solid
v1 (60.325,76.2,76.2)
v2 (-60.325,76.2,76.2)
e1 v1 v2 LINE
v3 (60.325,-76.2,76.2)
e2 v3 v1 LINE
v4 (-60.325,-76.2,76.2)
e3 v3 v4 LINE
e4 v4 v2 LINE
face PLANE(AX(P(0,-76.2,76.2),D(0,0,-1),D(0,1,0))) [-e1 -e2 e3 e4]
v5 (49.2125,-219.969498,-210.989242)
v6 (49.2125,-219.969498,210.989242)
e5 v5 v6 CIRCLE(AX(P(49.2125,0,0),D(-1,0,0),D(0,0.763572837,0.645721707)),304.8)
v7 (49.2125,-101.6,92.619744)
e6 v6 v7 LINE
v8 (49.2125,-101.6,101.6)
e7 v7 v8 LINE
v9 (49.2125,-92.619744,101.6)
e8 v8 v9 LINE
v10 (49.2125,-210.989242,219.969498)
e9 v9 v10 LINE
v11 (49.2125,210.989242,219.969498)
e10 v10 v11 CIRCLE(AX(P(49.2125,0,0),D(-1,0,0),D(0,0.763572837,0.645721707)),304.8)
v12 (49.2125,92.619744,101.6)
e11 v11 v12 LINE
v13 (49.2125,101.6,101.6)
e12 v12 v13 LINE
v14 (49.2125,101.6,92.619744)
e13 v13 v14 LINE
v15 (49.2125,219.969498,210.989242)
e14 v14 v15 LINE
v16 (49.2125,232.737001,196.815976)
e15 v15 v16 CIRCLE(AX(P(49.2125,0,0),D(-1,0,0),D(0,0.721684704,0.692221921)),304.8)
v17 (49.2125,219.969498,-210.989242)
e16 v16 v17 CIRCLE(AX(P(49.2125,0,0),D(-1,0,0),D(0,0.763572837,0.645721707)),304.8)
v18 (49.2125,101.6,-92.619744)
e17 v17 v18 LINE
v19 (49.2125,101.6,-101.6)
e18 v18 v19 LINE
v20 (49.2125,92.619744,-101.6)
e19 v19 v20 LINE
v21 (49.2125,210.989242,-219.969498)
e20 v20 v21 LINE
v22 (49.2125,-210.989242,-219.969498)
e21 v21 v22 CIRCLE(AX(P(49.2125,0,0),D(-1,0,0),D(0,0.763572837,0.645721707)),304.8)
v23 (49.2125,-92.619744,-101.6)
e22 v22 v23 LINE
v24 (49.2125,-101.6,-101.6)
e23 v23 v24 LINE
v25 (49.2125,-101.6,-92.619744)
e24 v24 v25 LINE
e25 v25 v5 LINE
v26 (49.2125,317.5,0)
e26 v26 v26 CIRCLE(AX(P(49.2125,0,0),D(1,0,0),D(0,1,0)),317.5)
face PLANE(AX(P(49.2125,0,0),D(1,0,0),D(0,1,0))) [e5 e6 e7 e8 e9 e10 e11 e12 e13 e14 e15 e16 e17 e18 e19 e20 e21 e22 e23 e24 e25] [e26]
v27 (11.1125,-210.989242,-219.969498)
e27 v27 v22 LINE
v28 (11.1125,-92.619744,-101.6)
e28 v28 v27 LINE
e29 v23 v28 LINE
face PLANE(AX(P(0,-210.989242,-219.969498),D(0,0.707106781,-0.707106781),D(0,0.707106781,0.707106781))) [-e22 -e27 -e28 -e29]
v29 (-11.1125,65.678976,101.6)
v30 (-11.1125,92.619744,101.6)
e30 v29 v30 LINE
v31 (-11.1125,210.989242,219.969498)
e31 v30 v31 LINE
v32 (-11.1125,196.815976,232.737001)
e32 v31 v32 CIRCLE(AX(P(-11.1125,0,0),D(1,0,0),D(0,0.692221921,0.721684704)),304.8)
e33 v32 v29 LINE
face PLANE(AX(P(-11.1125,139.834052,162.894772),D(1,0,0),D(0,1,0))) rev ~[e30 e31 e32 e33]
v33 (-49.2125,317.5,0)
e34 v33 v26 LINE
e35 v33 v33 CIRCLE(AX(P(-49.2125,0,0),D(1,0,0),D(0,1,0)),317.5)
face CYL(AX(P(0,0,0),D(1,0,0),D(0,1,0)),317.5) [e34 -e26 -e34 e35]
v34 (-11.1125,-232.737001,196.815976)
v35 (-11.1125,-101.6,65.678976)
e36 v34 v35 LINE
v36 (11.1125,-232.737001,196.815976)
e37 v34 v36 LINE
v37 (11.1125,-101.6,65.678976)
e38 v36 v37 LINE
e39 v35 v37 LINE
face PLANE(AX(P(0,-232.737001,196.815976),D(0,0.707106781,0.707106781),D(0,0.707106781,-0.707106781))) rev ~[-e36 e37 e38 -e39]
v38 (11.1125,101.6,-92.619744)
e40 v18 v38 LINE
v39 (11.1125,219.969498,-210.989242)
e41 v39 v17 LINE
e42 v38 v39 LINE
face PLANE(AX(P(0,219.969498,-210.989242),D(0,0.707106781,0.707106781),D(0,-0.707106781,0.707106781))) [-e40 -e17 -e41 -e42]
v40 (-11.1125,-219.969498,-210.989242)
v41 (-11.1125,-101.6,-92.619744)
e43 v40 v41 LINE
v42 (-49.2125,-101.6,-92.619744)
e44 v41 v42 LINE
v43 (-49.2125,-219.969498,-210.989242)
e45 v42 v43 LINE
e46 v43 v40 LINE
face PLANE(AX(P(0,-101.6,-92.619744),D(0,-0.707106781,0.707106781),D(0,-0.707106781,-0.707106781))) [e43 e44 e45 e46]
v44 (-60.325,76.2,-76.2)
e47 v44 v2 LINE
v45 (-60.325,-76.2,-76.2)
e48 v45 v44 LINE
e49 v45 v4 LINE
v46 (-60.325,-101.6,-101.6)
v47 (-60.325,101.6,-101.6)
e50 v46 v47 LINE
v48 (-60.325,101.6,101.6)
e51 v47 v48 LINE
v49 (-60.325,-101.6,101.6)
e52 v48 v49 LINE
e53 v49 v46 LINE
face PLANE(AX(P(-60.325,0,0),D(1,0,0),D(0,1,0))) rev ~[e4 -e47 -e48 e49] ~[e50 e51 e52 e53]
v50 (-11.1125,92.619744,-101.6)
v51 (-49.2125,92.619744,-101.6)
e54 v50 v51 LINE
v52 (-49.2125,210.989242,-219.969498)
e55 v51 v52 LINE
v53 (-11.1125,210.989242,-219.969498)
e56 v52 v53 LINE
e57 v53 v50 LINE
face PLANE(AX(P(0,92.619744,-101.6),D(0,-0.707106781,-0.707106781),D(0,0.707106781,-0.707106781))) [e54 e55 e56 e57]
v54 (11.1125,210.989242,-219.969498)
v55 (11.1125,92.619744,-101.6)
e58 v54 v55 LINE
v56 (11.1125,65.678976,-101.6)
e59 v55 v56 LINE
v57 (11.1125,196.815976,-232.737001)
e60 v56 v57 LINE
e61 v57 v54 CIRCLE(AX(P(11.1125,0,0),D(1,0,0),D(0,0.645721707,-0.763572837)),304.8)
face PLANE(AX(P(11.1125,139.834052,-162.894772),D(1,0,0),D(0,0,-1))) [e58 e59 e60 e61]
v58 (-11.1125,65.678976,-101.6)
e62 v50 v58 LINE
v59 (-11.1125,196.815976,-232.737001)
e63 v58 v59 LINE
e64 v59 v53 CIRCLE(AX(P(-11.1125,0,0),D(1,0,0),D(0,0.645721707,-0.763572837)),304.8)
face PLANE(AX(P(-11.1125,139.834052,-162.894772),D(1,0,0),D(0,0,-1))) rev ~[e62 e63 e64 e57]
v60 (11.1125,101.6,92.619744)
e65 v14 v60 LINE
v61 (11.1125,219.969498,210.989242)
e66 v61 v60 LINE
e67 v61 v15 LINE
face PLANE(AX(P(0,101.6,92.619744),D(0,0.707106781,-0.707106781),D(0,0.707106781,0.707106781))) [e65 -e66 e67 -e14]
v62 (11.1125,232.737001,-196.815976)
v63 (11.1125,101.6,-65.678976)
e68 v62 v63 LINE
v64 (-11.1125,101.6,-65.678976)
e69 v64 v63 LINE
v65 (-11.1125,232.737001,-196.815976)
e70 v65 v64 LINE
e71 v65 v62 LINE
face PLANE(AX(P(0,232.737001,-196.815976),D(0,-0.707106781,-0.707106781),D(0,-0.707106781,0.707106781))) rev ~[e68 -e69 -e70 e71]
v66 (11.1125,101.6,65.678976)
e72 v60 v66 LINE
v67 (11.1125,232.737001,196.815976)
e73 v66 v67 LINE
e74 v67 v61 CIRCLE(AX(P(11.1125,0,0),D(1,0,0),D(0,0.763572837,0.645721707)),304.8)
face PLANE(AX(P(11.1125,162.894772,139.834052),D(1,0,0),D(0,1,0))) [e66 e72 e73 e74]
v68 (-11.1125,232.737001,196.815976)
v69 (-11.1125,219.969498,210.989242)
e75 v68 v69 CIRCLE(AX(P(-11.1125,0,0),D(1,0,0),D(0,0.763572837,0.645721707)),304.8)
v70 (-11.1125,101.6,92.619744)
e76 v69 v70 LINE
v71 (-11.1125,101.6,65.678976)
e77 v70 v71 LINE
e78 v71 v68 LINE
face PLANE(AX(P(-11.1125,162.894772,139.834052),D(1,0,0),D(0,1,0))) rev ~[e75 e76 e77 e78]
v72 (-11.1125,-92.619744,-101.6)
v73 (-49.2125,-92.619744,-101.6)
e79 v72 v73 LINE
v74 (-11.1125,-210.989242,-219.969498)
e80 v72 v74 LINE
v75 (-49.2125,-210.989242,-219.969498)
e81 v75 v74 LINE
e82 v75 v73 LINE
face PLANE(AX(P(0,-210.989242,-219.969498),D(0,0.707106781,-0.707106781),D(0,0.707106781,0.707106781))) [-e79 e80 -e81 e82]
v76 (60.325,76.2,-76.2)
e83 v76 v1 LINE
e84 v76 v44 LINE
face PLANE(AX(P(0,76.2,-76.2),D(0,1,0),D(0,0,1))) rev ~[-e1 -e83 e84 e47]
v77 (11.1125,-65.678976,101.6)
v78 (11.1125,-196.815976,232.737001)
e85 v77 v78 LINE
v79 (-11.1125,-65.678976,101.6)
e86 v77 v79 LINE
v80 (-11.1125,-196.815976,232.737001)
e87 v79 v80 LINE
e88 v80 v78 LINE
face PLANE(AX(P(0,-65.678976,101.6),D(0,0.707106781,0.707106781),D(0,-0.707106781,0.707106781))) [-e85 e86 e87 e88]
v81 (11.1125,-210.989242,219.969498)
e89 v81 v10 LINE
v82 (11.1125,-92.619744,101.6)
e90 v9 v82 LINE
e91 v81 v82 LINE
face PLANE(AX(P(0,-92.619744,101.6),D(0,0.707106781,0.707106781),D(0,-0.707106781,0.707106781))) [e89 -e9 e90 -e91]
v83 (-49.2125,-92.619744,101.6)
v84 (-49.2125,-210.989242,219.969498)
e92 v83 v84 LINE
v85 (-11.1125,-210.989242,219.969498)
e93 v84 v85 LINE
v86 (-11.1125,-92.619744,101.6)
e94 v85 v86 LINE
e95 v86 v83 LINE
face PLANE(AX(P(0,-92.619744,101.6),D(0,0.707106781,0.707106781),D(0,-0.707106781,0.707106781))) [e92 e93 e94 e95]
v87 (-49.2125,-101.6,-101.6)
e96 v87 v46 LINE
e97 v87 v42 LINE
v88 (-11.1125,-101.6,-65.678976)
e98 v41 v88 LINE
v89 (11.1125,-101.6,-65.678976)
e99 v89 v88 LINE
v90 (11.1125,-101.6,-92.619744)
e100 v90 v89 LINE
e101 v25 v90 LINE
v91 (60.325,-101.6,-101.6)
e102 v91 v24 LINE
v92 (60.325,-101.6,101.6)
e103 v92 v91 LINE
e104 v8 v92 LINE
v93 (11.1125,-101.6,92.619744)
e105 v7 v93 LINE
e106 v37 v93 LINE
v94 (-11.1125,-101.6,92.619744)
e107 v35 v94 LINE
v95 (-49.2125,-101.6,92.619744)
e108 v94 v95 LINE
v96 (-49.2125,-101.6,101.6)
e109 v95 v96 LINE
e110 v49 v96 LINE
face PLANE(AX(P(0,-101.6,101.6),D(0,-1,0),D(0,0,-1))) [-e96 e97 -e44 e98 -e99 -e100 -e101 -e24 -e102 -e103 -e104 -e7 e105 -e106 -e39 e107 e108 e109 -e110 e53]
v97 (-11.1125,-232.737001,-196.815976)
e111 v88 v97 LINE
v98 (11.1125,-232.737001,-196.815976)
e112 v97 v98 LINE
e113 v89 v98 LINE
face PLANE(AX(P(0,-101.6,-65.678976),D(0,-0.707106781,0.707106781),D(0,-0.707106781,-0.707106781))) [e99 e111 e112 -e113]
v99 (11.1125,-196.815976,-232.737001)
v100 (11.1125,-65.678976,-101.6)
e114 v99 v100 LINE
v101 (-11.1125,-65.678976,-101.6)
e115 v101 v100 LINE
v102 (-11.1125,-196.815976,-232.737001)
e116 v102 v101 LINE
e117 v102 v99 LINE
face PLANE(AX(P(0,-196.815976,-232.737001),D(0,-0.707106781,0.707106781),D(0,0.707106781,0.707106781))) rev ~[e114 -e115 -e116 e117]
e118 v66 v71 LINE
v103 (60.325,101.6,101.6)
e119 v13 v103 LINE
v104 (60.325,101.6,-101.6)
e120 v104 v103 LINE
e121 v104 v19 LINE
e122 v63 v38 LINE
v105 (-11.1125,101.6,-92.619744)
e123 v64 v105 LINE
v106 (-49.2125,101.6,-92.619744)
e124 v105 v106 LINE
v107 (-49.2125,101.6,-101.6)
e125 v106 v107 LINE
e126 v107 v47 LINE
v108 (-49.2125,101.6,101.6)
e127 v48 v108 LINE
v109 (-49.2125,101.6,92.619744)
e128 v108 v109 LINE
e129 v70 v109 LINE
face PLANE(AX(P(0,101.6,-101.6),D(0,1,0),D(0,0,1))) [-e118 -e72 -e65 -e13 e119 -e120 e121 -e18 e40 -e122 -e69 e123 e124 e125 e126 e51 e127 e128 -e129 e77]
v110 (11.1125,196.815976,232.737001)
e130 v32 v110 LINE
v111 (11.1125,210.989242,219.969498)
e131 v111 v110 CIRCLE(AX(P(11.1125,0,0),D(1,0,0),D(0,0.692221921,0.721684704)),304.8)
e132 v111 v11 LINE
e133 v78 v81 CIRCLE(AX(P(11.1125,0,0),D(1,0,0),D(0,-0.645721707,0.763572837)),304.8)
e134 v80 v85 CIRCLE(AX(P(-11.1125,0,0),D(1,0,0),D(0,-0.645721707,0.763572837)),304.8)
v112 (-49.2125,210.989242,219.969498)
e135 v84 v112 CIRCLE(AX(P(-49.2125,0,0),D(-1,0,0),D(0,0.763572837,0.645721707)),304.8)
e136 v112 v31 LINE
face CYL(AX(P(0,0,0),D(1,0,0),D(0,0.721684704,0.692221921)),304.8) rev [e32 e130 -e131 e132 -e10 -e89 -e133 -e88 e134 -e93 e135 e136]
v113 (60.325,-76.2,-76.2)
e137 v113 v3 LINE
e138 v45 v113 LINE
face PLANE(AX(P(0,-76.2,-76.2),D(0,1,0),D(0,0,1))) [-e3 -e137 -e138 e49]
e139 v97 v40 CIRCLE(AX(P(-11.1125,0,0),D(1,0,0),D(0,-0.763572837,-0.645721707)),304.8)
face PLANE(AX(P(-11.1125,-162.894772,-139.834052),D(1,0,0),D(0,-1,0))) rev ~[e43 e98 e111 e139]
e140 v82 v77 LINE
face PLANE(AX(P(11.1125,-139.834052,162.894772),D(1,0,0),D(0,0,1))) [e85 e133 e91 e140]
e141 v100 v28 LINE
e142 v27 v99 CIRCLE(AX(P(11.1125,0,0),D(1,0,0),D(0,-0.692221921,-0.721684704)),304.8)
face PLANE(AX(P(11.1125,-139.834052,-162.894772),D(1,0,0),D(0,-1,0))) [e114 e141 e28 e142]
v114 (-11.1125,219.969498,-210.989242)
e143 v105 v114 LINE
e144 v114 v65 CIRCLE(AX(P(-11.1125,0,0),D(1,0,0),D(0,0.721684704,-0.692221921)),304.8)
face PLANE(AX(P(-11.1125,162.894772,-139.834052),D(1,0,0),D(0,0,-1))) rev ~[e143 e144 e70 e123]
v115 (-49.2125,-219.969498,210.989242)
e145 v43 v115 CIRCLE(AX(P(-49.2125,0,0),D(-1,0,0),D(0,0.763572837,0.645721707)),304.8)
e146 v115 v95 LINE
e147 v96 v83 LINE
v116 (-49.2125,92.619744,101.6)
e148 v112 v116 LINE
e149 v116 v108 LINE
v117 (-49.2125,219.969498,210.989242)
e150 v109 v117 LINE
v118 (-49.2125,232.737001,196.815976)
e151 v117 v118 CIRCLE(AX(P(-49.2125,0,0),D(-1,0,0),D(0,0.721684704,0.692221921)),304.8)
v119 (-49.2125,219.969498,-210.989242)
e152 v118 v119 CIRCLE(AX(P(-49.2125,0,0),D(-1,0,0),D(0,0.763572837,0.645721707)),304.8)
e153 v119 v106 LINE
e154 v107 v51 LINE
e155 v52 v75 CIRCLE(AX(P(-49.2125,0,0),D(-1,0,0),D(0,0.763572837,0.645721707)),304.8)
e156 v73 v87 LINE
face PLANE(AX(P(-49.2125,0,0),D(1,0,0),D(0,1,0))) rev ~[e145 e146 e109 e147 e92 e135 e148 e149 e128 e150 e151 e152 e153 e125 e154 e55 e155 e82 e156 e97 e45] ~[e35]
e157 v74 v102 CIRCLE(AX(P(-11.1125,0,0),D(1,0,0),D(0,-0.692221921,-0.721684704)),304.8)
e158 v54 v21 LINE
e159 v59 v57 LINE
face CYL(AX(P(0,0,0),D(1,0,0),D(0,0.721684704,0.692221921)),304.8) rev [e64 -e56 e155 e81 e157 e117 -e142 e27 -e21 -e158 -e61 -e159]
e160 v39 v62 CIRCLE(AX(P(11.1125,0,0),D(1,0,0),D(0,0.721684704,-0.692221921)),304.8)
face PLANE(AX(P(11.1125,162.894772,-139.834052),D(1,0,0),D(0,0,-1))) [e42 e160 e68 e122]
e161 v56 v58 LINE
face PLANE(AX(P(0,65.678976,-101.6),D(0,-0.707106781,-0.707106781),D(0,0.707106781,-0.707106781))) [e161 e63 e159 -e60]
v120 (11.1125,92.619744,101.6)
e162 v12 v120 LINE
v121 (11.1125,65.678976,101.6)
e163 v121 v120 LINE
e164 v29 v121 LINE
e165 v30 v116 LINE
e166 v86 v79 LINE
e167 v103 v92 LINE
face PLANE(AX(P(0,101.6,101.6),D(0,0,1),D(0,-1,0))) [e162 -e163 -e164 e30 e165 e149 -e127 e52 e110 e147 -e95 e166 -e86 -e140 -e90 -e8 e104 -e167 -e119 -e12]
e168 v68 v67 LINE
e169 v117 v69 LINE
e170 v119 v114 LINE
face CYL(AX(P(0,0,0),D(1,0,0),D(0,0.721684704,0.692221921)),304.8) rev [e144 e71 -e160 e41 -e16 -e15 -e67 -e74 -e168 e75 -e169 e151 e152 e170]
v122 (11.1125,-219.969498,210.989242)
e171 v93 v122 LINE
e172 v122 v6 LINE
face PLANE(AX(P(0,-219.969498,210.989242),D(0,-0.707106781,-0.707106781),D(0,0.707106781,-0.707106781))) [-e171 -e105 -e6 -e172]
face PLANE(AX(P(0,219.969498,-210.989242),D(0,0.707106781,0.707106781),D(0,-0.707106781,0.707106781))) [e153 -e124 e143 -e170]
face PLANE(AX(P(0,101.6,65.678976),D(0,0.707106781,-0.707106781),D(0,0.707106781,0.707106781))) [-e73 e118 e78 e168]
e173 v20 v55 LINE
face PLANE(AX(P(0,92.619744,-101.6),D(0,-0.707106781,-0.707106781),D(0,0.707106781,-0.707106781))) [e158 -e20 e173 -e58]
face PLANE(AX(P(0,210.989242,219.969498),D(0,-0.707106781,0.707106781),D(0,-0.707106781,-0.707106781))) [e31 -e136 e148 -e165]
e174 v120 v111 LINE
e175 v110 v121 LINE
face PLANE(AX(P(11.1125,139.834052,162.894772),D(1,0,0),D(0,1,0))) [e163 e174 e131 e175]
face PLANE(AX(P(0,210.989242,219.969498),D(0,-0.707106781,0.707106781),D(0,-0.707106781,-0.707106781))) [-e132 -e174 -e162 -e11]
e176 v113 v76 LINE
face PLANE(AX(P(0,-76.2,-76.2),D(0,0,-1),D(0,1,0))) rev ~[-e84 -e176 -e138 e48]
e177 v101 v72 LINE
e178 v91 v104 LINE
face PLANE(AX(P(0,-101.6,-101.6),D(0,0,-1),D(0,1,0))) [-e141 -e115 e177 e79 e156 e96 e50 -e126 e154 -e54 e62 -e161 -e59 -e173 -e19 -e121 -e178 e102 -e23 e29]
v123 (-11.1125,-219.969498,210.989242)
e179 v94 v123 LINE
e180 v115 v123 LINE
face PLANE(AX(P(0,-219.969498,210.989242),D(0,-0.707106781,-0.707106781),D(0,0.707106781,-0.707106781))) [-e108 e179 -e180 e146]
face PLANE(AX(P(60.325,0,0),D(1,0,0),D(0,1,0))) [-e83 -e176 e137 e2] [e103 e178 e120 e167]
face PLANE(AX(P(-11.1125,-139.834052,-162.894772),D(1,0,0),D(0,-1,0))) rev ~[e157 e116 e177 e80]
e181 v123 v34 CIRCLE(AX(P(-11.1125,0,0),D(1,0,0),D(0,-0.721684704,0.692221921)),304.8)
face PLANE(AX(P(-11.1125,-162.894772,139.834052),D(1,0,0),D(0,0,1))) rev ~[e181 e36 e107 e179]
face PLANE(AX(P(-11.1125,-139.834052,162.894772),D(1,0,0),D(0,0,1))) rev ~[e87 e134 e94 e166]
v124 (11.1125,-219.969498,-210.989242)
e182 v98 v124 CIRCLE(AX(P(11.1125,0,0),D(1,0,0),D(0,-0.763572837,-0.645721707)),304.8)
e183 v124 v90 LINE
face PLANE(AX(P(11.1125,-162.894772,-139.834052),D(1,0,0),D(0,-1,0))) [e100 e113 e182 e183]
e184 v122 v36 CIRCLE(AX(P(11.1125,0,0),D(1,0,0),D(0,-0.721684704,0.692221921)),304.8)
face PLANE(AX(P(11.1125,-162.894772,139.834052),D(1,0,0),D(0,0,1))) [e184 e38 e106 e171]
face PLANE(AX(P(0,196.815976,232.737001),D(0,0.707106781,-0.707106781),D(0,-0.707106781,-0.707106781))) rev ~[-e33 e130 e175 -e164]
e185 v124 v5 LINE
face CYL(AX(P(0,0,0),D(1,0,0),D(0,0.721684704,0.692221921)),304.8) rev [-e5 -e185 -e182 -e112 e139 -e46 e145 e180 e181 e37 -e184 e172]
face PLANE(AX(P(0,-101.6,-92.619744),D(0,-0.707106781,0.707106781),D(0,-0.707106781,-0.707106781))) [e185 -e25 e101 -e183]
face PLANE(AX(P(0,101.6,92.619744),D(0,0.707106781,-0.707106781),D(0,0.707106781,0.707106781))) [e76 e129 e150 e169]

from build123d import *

# Parameters (mm, degrees)
F0_W            = 152.4
F0_H            = 152.4
F1_DEPTH        = 60.325
F2_DEPTH        = 49.2125
F2_COPIES_COUNT = 4
F3_DEPTH        = 11.1125
F3_COPIES_COUNT = 4
F0_R            = 317.5
F4_DEPTH        = 49.2125


# Not quite as in the source:
# - a pattern or mirror of a feature is missing from the dataset's text; its kind, count and spacing are read off the source's solid


with BuildPart() as f1:
    # F0 (on Right) → F1 (new body, symmetric)
    with BuildSketch(Plane.YZ):
        Polygon((101.6, -101.6), (101.6, 65.6789755157), (101.6, 92.6197438789), (101.6, 101.6), (92.6197438789, 101.6), (65.6789755157, 101.6), (-101.6, 101.6), (-101.6, -101.6), align=None)
        Rectangle(F0_W, F0_H, mode=Mode.SUBTRACT)
    extrude(amount=F1_DEPTH, both=True)

    # F0 (on Right) → F2 (join, symmetric)
    with BuildSketch(Plane.YZ):
        with BuildLine():
            Line((101.6, 92.6197438789), (219.9694977227, 210.9892416016))
            ThreePointArc((219.9694977227, 210.9892416016), (215.5261469057, 215.5261469057), (210.9892416016, 219.9694977227))
            Line((210.9892416016, 219.9694977227), (92.6197438789, 101.6))
            Line((92.6197438789, 101.6), (101.6, 101.6))
            Line((101.6, 101.6), (101.6, 92.6197438789))
        make_face()
    f2 = extrude(amount=F2_DEPTH, both=True)

    # F2_copies: F2 ×4 about axis
    f2_copies_axis = Axis((0, 0, 0), (1, 0, 0))
    for i in range(1, F2_COPIES_COUNT):
        add(f2.rotate(f2_copies_axis, i * 360 / F2_COPIES_COUNT))

    # F0 (on Right) → F3 (join, symmetric)
    with BuildSketch(Plane.YZ):
        with BuildLine():
            ThreePointArc((210.9892416016, 219.9694977227), (204.0025151944, 226.4641556502), (196.815976229, 232.7370007133))
            Line((196.815976229, 232.7370007133), (65.6789755157, 101.6))
            Line((65.6789755157, 101.6), (92.6197438789, 101.6))
            Line((92.6197438789, 101.6), (210.9892416016, 219.9694977227))
        make_face()
        with BuildLine():
            Line((101.6, 65.6789755157), (232.7370007133, 196.815976229))
            ThreePointArc((232.7370007133, 196.815976229), (226.4641556502, 204.0025151944), (219.9694977227, 210.9892416016))
            Line((219.9694977227, 210.9892416016), (101.6, 92.6197438789))
            Line((101.6, 92.6197438789), (101.6, 65.6789755157))
        make_face()
    f3 = extrude(amount=F3_DEPTH, both=True)

    # F3_copies: F3 ×4 about axis
    f3_copies_axis = Axis((0, 0, 0), (1, 0, 0))
    for i in range(1, F3_COPIES_COUNT):
        add(f3.rotate(f3_copies_axis, i * 360 / F3_COPIES_COUNT))

    # F0 (on Right) → F4 (join, symmetric)
    with BuildSketch(Plane.YZ):
        Circle(F0_R)
        with BuildLine():
            ThreePointArc((232.7370007133, 196.815976229), (286.2178172454, 104.7969517271), (304.8, 0))
            ThreePointArc((304.8, 0), (-276.4891946845, -128.2839242567), (196.815976229, 232.7370007133))
            ThreePointArc((196.815976229, 232.7370007133), (204.0025151944, 226.4641556502), (210.9892416016, 219.9694977227))
            ThreePointArc((210.9892416016, 219.9694977227), (215.5261469057, 215.5261469057), (219.9694977227, 210.9892416016))
            ThreePointArc((219.9694977227, 210.9892416016), (226.4641556502, 204.0025151944), (232.7370007133, 196.815976229))
        make_face(mode=Mode.SUBTRACT)
    extrude(amount=F4_DEPTH, both=True)


solid = f1.part
